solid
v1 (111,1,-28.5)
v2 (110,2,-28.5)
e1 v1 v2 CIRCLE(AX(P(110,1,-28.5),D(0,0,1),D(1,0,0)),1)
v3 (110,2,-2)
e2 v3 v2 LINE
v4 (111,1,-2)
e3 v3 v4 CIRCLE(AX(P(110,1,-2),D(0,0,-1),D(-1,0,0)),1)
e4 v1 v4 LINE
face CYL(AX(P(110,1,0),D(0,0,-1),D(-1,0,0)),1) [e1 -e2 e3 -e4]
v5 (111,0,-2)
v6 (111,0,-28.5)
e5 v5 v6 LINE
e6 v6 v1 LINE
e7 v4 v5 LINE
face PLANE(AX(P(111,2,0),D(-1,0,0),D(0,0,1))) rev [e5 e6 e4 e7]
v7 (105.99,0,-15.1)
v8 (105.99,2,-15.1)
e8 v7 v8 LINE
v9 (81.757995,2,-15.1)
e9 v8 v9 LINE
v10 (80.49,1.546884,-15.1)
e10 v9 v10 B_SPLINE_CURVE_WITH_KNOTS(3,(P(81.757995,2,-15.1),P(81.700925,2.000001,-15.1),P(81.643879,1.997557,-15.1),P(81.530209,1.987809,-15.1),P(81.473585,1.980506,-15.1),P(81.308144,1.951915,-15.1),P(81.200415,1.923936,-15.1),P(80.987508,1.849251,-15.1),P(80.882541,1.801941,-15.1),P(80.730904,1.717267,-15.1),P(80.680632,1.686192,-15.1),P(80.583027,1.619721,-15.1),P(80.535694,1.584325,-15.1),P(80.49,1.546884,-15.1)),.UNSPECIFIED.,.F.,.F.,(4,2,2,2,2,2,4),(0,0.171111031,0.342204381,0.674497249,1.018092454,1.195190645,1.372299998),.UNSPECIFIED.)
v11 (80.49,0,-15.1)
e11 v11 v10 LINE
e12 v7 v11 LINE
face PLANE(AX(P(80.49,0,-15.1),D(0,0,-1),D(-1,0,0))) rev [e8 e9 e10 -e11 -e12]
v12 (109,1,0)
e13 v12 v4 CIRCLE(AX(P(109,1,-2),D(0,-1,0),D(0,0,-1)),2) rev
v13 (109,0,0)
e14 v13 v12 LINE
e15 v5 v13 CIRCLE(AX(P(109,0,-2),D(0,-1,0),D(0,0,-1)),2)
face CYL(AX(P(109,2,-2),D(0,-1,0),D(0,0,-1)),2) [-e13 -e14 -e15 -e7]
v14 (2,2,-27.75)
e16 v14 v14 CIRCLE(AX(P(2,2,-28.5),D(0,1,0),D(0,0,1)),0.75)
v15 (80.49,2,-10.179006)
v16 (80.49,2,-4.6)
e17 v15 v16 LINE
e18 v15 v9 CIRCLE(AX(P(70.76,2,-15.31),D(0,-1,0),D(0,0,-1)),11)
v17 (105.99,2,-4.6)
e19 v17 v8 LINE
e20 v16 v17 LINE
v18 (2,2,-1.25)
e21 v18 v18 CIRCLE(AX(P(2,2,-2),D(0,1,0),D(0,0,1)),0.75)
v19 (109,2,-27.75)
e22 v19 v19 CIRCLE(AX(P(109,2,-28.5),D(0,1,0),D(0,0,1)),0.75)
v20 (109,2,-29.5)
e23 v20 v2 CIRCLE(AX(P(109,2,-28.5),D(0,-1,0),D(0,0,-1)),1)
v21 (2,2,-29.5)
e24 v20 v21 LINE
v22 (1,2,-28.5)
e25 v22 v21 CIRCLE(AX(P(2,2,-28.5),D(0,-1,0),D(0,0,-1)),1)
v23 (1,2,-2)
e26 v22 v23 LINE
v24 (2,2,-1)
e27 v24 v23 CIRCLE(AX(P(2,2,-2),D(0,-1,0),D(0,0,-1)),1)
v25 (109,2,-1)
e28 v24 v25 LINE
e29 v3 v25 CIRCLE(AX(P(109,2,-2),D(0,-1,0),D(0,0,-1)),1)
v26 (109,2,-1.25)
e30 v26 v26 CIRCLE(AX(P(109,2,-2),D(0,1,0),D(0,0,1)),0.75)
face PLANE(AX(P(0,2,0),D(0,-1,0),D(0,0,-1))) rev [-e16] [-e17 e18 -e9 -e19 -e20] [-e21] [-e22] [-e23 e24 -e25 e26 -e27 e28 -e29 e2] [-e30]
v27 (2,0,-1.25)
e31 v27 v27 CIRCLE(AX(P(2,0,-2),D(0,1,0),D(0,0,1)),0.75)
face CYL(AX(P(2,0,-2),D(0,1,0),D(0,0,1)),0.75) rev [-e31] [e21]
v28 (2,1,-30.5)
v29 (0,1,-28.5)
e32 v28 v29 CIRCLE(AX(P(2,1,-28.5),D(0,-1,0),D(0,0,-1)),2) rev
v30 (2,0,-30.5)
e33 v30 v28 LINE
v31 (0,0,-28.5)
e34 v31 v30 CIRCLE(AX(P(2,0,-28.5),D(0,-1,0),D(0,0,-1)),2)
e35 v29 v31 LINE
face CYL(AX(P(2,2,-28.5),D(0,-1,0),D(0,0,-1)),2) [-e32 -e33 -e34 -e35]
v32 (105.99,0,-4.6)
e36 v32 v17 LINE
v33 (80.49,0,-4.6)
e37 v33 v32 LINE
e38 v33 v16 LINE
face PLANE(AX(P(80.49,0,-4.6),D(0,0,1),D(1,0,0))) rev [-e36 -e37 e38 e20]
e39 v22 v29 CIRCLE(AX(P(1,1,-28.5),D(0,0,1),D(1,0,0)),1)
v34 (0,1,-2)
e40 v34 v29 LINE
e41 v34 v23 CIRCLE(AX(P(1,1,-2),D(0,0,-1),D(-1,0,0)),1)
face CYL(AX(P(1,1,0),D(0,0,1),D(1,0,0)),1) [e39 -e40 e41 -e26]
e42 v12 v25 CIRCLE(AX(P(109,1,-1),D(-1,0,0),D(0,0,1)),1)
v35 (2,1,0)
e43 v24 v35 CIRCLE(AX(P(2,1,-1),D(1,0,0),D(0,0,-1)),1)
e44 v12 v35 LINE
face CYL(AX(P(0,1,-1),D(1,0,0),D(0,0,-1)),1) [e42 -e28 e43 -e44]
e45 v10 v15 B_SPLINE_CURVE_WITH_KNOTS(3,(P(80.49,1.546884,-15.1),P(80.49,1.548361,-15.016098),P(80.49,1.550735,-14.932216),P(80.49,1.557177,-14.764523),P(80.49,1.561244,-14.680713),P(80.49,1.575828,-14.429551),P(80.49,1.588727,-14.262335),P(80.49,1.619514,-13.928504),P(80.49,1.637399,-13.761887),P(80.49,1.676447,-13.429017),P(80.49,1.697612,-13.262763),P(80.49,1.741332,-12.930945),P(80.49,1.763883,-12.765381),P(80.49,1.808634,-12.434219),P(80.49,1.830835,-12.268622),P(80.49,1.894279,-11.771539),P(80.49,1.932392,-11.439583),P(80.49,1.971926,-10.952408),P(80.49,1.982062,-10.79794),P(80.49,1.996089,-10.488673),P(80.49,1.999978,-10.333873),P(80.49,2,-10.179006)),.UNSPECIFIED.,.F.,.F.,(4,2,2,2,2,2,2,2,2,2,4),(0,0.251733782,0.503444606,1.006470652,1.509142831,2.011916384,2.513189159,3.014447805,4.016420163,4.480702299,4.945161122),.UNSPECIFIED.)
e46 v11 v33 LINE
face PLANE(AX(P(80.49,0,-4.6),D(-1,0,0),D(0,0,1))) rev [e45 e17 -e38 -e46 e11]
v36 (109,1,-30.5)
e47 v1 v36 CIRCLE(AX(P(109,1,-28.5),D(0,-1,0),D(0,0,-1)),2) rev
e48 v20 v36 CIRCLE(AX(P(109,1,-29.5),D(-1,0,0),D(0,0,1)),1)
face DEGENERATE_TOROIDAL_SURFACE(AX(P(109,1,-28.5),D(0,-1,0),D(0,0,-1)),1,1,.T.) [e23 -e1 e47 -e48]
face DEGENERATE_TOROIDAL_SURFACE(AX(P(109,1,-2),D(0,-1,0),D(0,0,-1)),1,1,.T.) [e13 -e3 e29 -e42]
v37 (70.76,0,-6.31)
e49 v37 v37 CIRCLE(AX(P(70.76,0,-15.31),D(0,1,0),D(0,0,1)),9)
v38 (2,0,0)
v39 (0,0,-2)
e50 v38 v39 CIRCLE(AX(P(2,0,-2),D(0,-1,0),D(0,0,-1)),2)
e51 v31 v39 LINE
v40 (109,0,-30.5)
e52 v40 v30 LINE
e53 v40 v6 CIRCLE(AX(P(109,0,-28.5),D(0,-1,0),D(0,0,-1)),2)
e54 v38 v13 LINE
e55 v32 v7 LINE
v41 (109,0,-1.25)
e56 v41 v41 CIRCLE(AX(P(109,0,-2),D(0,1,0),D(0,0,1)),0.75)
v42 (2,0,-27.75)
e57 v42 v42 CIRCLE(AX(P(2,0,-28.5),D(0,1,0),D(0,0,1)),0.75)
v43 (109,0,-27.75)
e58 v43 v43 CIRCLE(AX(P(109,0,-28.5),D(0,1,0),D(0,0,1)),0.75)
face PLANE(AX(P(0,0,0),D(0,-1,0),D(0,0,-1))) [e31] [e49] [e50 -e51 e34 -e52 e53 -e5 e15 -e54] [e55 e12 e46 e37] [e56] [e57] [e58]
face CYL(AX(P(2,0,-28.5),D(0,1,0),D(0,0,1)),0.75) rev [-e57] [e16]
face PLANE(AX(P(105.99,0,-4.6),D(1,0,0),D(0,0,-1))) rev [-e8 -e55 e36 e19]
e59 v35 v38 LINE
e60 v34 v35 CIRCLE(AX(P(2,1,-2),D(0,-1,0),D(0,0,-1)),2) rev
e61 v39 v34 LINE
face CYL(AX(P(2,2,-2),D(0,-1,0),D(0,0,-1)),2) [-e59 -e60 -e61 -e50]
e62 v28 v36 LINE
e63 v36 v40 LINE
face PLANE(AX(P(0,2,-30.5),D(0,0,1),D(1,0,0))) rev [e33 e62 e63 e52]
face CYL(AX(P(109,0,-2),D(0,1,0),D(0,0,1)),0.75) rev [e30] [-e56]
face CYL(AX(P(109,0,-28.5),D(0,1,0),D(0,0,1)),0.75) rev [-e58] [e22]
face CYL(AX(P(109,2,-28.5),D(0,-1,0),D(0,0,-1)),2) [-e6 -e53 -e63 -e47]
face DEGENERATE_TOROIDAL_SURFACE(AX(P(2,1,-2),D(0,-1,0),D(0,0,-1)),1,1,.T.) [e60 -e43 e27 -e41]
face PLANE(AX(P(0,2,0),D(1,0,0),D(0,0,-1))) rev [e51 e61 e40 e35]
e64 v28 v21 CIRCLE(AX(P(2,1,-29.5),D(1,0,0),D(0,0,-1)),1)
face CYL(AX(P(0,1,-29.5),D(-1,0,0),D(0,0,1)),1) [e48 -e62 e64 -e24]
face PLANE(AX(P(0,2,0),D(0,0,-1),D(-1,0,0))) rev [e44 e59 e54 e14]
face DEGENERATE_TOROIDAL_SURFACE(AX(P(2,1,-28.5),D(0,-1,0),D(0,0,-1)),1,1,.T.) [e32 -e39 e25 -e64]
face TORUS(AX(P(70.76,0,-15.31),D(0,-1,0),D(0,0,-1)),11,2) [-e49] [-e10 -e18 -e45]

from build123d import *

# Parameters (mm, degrees)
SKETCH1_W           = 111
SKETCH1_H           = 30.5
BOSS_EXTRUDE1_DEPTH = 2
SKETCH2_R           = 0.75
SKETCH2_R_2         = 9
SKETCH2_W           = 25.5
SKETCH2_H           = 10.5
CUT_EXTRUDE1_DEPTH  = 116.131446616
FILLET1_R           = 1
FILLET2_R           = 2


with BuildPart() as part:
    # Sketch1 → Boss-Extrude1 (new body)
    with BuildSketch(Plane(origin=(0, 0, 0), x_dir=(1, 0, 0), z_dir=(0, 1, 0))):
        with Locations((55.5, 15.25)):
            Rectangle(SKETCH1_W, SKETCH1_H)
    extrude(amount=BOSS_EXTRUDE1_DEPTH)

    # Sketch2 → Cut-Extrude1 (cut, through all)
    with BuildSketch(Plane(origin=(0, 2, 0), x_dir=(1, 0, 0), z_dir=(0, 1, 0))):
        with Locations(Location((2, 28.5, 0), (0, 0, 270))):
            Circle(SKETCH2_R)
        with Locations(Location((2, 2, 0), (0, 0, 270))):
            Circle(SKETCH2_R)
        with Locations(Location((109, 2, 0), (0, 0, 270))):
            Circle(SKETCH2_R)
        with Locations(Location((109, 28.5, 0), (0, 0, 270))):
            Circle(SKETCH2_R)
        with Locations(Location((70.76, 15.31, 0), (0, 0, 270))):
            Circle(SKETCH2_R_2)
        with Locations((93.24, 9.85)):
            Rectangle(SKETCH2_W, SKETCH2_H)
    extrude(amount=-CUT_EXTRUDE1_DEPTH, mode=Mode.SUBTRACT)

    # Fillet1
    fillet1_edges = [part.edges().sort_by_distance(p)[0] for p in [
        (111, 2, -15.25),
        (55.5, 2, -30.5),
        (0, 2, -15.25),
        (55.5, 2, 0),
    ]]
    fillet(fillet1_edges, radius=FILLET1_R)

    # Fillet2
    # the kernel refuses this fillet: 2 mm, written as the material it takes off along each edge
    with BuildSketch(Plane(origin=(109, 2, -2), x_dir=(0, 0, 1), z_dir=(-1, 0, 0))) as fillet2_piece_1:
        with BuildLine():
            CenterArc((1, -1), 1, 0, 90)
            Line((2, -1), (2, 0))
            Line((2, 0), (1, 0))
        make_face()
    revolve(axis=Axis((109, 2, -2), (0, 1, 0)), revolution_arc=90, mode=Mode.SUBTRACT)
    with BuildSketch(Plane(origin=(2, 2, -2), x_dir=(-1, 0, 0), z_dir=(0, 0, -1))) as fillet2_piece_2:
        with BuildLine():
            CenterArc((1, -1), 1, 0, 90)
            Line((2, -1), (2, 0))
            Line((2, 0), (1, 0))
        make_face()
    revolve(axis=Axis((2, 2, -2), (0, 1, 0)), revolution_arc=90, mode=Mode.SUBTRACT)
    with BuildSketch(Plane(origin=(109, 2, -28.5), x_dir=(1, 0, 0), z_dir=(0, 0, 1))) as fillet2_piece_3:
        with BuildLine():
            CenterArc((1, -1), 1, 0, 90)
            Line((2, -1), (2, 0))
            Line((2, 0), (1, 0))
        make_face()
    revolve(axis=Axis((109, 2, -28.5), (0, 1, 0)), revolution_arc=90, mode=Mode.SUBTRACT)
    with BuildSketch(Plane(origin=(2, 2, -28.5), x_dir=(0, 0, -1), z_dir=(1, 0, 0))) as fillet2_piece_4:
        with BuildLine():
            CenterArc((1, -1), 1, 0, 90)
            Line((2, -1), (2, 0))
            Line((2, 0), (1, 0))
        make_face()
    revolve(axis=Axis((2, 2, -28.5), (0, 1, 0)), revolution_arc=90, mode=Mode.SUBTRACT)
    with BuildSketch(Plane(origin=(70.76, 2, -15.31), x_dir=(0, 0, 1), z_dir=(-1, 0, 0))) as fillet2_piece_5:
        with BuildLine():
            CenterArc((9 + FILLET2_R, -FILLET2_R), FILLET2_R, 90, 90)
            Line((9, -FILLET2_R), (9, 0))
            Line((9, 0), (9 + FILLET2_R, 0))
        make_face()
    revolve(axis=Axis((70.76, 2, -15.31), (0, 1, 0)), mode=Mode.SUBTRACT)
    with BuildSketch(Plane(origin=(0, -5, -30.5), x_dir=(0, 0, 1), z_dir=(0, 1, 0)), Plane(origin=(0, -5, 0), x_dir=(1, 0, 0), z_dir=(0, 1, 0))) as fillet2_piece_6:
        with BuildLine():
            CenterArc((FILLET2_R, FILLET2_R), FILLET2_R, 180, 90)
            Line((0, FILLET2_R), (0, 0))
            Line((0, 0), (FILLET2_R, 0))
        make_face()
    extrude(amount=7, mode=Mode.SUBTRACT)
    with BuildSketch(Plane(origin=(111, -5, -30.5), x_dir=(0, 0, 1), z_dir=(0, 1, 0)), Plane(origin=(111, -5, 0), x_dir=(-1, 0, 0), z_dir=(0, 1, 0))) as fillet2_piece_7:
        with BuildLine():
            CenterArc((FILLET2_R, -FILLET2_R), FILLET2_R, 90, 90)
            Line((0, -FILLET2_R), (0, 0))
            Line((0, 0), (FILLET2_R, 0))
        make_face()
    extrude(amount=7, mode=Mode.SUBTRACT)


solid = part.part
